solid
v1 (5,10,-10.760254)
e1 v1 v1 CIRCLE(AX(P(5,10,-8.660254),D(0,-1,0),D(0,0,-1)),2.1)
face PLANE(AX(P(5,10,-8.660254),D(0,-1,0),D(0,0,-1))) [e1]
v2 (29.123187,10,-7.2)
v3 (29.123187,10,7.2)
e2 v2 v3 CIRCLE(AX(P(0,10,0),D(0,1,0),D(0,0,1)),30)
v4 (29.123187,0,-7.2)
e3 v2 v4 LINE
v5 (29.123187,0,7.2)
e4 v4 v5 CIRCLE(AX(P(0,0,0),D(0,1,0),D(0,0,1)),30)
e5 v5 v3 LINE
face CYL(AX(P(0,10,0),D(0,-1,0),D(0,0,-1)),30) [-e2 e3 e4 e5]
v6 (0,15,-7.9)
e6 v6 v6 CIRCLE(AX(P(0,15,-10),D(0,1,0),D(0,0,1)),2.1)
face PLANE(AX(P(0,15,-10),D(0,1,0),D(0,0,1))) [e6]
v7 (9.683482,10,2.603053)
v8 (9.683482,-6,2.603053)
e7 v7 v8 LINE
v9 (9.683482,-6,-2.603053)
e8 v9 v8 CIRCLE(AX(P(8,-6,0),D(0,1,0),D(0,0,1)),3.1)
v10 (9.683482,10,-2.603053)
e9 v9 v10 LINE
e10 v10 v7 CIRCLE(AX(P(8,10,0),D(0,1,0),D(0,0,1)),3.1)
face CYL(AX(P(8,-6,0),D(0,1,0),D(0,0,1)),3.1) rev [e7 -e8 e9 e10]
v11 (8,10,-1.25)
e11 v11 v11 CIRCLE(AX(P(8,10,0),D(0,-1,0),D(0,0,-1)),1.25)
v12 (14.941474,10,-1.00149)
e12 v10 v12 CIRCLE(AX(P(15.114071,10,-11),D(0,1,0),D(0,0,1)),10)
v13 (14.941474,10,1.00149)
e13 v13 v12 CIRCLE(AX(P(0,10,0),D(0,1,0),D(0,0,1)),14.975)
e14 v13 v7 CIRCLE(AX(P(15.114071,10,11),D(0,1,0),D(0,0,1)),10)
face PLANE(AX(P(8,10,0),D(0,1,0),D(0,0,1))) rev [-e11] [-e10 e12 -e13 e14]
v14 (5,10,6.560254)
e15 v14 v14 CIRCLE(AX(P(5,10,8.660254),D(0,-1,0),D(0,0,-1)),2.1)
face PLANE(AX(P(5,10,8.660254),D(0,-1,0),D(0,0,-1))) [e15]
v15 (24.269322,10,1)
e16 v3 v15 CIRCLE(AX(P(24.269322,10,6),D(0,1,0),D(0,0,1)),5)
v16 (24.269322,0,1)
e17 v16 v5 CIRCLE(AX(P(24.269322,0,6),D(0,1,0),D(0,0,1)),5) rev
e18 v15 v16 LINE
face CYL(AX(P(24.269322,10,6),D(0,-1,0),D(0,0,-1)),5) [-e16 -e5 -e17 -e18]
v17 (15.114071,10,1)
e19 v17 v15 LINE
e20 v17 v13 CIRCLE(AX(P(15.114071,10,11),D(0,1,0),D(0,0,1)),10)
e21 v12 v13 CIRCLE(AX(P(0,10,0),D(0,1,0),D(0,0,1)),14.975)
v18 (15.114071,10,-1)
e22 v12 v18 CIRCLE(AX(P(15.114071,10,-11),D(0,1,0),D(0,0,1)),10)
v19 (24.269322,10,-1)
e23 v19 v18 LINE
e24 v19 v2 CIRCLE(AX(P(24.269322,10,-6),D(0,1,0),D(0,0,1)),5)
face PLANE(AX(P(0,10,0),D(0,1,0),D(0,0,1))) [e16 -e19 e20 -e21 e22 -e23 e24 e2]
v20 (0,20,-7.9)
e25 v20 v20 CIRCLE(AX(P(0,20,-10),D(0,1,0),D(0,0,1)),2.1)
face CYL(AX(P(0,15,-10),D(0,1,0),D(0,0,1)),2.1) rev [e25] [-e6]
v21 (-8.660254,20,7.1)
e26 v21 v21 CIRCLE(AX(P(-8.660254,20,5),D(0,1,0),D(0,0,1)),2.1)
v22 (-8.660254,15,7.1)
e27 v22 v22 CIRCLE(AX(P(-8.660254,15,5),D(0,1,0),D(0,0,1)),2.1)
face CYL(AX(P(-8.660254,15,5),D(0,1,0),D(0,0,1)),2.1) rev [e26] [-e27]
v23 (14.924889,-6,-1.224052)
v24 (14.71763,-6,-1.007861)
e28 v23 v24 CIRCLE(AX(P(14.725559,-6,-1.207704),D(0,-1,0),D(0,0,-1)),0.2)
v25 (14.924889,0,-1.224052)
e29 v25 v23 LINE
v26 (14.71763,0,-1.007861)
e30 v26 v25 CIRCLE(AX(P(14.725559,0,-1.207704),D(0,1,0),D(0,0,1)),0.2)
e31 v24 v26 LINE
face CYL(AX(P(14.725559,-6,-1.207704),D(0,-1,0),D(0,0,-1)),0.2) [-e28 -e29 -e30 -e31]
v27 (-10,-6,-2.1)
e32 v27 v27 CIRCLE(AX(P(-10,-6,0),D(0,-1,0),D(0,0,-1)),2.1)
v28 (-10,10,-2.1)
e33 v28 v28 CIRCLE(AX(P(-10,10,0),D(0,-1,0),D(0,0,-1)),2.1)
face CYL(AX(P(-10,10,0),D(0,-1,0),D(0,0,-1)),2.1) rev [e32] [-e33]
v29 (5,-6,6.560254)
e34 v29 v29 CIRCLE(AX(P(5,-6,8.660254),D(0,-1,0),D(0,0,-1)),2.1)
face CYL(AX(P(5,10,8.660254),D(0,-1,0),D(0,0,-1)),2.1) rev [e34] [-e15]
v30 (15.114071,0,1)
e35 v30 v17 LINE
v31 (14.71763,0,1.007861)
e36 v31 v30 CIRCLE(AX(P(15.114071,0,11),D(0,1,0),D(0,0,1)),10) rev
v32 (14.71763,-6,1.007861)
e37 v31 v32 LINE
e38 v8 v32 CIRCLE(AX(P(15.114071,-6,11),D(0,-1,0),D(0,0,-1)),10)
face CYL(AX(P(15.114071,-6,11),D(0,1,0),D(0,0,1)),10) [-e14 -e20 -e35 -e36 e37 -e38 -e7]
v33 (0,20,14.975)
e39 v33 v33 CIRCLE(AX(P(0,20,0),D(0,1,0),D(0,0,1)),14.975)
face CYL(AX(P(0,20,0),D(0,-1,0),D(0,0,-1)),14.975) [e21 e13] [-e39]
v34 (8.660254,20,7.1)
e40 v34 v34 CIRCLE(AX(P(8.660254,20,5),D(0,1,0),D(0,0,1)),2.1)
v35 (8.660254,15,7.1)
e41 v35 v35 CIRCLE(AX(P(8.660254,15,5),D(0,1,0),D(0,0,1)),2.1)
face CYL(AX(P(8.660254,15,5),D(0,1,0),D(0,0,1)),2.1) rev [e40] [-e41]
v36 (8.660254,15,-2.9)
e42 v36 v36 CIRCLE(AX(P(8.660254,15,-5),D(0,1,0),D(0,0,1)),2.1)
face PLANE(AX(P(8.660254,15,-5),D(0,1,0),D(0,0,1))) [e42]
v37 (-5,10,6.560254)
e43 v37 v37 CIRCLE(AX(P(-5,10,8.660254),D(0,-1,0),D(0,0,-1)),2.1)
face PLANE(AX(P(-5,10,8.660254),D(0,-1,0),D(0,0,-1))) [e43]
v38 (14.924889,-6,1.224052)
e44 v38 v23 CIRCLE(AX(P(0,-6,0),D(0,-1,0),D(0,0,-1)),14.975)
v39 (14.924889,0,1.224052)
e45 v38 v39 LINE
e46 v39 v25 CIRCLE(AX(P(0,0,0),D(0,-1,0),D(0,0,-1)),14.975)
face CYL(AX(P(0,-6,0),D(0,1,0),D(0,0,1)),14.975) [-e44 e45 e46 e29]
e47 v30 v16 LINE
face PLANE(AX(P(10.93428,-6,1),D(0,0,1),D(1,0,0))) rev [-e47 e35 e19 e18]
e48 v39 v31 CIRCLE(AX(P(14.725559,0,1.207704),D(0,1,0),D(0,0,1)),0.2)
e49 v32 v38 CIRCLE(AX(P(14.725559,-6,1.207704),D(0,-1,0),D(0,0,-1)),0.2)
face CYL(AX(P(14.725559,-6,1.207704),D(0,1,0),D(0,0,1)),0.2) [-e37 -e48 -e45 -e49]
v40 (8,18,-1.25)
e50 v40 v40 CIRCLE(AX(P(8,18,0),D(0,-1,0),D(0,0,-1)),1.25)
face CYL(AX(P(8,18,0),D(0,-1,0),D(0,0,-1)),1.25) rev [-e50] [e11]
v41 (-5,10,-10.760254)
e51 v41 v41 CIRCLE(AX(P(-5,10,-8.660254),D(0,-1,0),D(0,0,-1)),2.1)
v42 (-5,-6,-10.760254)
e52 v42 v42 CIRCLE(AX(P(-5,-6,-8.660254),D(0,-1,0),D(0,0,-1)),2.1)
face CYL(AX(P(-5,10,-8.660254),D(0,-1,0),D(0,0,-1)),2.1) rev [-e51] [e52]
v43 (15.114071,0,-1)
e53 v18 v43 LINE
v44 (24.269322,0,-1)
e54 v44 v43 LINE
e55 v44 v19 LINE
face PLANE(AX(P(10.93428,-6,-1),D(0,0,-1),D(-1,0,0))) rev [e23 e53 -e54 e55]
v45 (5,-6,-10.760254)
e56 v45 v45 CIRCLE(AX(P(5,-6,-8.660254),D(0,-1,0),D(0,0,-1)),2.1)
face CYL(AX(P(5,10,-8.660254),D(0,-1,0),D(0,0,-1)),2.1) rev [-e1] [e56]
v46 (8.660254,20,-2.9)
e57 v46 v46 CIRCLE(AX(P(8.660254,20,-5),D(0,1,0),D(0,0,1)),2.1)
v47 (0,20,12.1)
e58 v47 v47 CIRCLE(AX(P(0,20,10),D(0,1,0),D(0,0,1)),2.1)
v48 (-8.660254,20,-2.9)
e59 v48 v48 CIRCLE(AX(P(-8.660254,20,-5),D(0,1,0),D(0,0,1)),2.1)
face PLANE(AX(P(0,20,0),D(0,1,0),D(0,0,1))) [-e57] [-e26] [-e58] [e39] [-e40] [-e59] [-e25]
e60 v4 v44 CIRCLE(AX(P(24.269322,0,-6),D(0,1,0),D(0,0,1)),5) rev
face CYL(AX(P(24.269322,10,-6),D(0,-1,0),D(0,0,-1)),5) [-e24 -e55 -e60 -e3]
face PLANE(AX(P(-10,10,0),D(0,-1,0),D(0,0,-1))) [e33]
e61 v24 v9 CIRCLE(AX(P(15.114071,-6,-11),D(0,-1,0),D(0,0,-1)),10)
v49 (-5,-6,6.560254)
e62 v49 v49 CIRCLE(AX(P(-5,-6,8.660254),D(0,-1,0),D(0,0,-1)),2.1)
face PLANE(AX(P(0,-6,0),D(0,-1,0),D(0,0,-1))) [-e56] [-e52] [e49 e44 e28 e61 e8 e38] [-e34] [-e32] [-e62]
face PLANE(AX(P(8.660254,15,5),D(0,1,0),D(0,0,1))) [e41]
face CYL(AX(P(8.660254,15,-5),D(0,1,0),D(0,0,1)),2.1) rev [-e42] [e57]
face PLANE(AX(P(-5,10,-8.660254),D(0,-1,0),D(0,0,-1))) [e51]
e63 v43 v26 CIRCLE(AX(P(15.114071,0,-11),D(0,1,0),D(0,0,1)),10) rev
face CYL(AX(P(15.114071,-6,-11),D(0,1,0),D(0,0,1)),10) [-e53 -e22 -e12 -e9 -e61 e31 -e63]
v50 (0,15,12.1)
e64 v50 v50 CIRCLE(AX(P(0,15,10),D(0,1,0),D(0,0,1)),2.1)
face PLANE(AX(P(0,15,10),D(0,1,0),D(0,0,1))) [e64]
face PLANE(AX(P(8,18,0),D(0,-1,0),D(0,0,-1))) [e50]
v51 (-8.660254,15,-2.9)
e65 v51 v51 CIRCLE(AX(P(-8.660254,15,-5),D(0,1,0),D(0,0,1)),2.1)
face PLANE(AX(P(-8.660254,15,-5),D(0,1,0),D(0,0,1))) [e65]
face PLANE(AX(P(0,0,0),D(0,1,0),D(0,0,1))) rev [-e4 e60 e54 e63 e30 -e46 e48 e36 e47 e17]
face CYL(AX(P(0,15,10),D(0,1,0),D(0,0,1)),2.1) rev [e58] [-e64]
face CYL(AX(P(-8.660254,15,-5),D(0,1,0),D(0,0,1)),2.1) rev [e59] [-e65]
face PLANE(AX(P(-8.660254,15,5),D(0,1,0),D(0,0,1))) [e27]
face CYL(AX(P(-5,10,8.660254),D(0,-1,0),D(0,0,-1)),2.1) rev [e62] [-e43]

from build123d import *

# Parameters (mm, degrees)
SKETCH_1_R          = 30
EXTRUDE_1_DEPTH     = 10
SKETCH_2_R          = 14.975
EXTRUDE_2_DEPTH     = 10
EXTRUDE_START       = 6
SKETCH_3_R          = 14.975
EXTRUDE_3_DEPTH     = 6
SKETCH_4_R          = 2.1
CUT_EXTRUDE_1_DEPTH = 16
CUT_EXTRUDE_3_DEPTH = 46.343136195
FILLET_1_R          = 10
FILLET_2_R          = 5
FILLET_3_R          = 0.2
SKETCH_7_R          = 1.25
CUT_EXTRUDE_4_DEPTH = 8
SKETCH_8_R          = 2.1
CUT_EXTRUDE_5_DEPTH = 5


with BuildPart() as part:
    # 草图1 → 凸台-拉伸1 (new body)
    with BuildSketch(Plane(origin=(0, 0, 0), x_dir=(1, 0, 0), z_dir=(0, 1, 0))):
        with Locations(Location((0, 0, 0), (0, 0, 270))):
            Circle(SKETCH_1_R)
    extrude(amount=EXTRUDE_1_DEPTH)

    # 草图2 → 凸台-拉伸2 (add)
    with BuildSketch(Plane(origin=(0, 10, 0), x_dir=(1, 0, 0), z_dir=(0, 1, 0))):
        with Locations(Location((0, 0, 0), (0, 0, 270))):
            Circle(SKETCH_2_R)
    extrude(amount=EXTRUDE_2_DEPTH)

    # 草图3 → 凸台-拉伸3 (add)
    with BuildSketch(Plane.XZ.offset(EXTRUDE_START)):
        with Locations(Location((0, 0, 0), (0, 0, 90))):
            Circle(SKETCH_3_R)
    extrude(amount=-EXTRUDE_3_DEPTH)

    # 草图4 → 切除-拉伸1 (cut)
    with BuildSketch(Plane.XZ.offset(6)):
        with Locations(Location((-10, 0, 0), (0, 0, 270))):
            Circle(SKETCH_4_R)
        with Locations(Location((-5, 8.660254038, 0), (0, 0, 270))):
            Circle(SKETCH_4_R)
        with Locations(Location((5, 8.660254038, 0), (0, 0, 270))):
            Circle(SKETCH_4_R)
        with Locations(Location((5, -8.660254038, 0), (0, 0, 270))):
            Circle(SKETCH_4_R)
        with Locations(Location((-5, -8.660254038, 0), (0, 0, 270))):
            Circle(SKETCH_4_R)
    extrude(amount=-CUT_EXTRUDE_1_DEPTH, mode=Mode.SUBTRACT)

    # 草图6 → 切除-拉伸3 (cut, through all)
    with BuildSketch(Plane(origin=(0, 10, 0), x_dir=(1, 0, 0), z_dir=(0, 1, 0))):
        with BuildLine():
            Line((10.93428015, 1), (30.93428015, 1))
            Line((30.93428015, 1), (30.93428015, -1))
            Line((30.93428015, -1), (10.93428015, -1))
            ThreePointArc((10.93428015, -1), (4.9, 0), (10.93428015, 1))
        make_face()
    extrude(amount=-CUT_EXTRUDE_3_DEPTH, mode=Mode.SUBTRACT)

    # 圆角1
    # the kernel refuses this fillet: 10 mm, written as the material it takes off along each edge
    with BuildSketch(Plane(origin=(10.93428015, 10, -1), x_dir=(1, 0, 0), z_dir=(0, -1, 0))) as fillet_1_piece_1:
        with BuildLine():
            CenterArc((4.179790415, -10), FILLET_1_R, 90, 32.892109865)
            ThreePointArc((-1.250797803, -1.603053435), (-0.490230703, -0.906992999), (0, 0))
            Line((0, 0), (4.179790415, 0))
        make_face()
    extrude(amount=26.449476036, mode=Mode.SUBTRACT)
    with BuildSketch(Plane(origin=(10.93428015, 10, 1), x_dir=(1, 0, 0), z_dir=(0, -1, 0))) as fillet_1_piece_2:
        with BuildLine():
            CenterArc((4.179790415, 10), FILLET_1_R, 237.107890135, 32.892109865)
            ThreePointArc((-1.250797803, 1.603053435), (-0.490230703, 0.906992999), (0, 0))
            Line((0, 0), (4.179790415, 0))
        make_face()
    extrude(amount=26.449476036, mode=Mode.SUBTRACT)

    # 圆角2
    fillet_2_edges = [part.edges().sort_by_distance(p)[0] for p in [
        (29.983328701, 5, -1),
        (29.983328701, 5, 1),
    ]]
    fillet(fillet_2_edges, radius=FILLET_2_R)

    # 圆角3
    fillet_3_edges = [part.edges().sort_by_distance(p)[0] for p in [
        (14.941473943, -3, 1.001489591),
        (14.941473943, -3, -1.001489591),
    ]]
    fillet(fillet_3_edges, radius=FILLET_3_R)

    # 草图7 → 切除-拉伸4 (cut)
    with BuildSketch(Plane.XZ.offset(-10)):
        with Locations(Location((8, 0, 0), (0, 0, 270))):
            Circle(SKETCH_7_R)
    extrude(amount=-CUT_EXTRUDE_4_DEPTH, mode=Mode.SUBTRACT)

    # 草图8 → 切除-拉伸5 (cut)
    with BuildSketch(Plane(origin=(0, 20, 0), x_dir=(1, 0, 0), z_dir=(0, 1, 0))):
        with Locations(Location((-8.660254038, 5, 0), (0, 0, 270))):
            Circle(SKETCH_8_R)
        with Locations(Location((0, 10, 0), (0, 0, 270))):
            Circle(SKETCH_8_R)
        with Locations(Location((8.660254038, 5, 0), (0, 0, 270))):
            Circle(SKETCH_8_R)
        with Locations(Location((8.660254038, -5, 0), (0, 0, 270))):
            Circle(SKETCH_8_R)
        with Locations(Location((0, -10, 0), (0, 0, 270))):
            Circle(SKETCH_8_R)
        with Locations(Location((-8.660254038, -5, 0), (0, 0, 270))):
            Circle(SKETCH_8_R)
    extrude(amount=-CUT_EXTRUDE_5_DEPTH, mode=Mode.SUBTRACT)


solid = part.part
